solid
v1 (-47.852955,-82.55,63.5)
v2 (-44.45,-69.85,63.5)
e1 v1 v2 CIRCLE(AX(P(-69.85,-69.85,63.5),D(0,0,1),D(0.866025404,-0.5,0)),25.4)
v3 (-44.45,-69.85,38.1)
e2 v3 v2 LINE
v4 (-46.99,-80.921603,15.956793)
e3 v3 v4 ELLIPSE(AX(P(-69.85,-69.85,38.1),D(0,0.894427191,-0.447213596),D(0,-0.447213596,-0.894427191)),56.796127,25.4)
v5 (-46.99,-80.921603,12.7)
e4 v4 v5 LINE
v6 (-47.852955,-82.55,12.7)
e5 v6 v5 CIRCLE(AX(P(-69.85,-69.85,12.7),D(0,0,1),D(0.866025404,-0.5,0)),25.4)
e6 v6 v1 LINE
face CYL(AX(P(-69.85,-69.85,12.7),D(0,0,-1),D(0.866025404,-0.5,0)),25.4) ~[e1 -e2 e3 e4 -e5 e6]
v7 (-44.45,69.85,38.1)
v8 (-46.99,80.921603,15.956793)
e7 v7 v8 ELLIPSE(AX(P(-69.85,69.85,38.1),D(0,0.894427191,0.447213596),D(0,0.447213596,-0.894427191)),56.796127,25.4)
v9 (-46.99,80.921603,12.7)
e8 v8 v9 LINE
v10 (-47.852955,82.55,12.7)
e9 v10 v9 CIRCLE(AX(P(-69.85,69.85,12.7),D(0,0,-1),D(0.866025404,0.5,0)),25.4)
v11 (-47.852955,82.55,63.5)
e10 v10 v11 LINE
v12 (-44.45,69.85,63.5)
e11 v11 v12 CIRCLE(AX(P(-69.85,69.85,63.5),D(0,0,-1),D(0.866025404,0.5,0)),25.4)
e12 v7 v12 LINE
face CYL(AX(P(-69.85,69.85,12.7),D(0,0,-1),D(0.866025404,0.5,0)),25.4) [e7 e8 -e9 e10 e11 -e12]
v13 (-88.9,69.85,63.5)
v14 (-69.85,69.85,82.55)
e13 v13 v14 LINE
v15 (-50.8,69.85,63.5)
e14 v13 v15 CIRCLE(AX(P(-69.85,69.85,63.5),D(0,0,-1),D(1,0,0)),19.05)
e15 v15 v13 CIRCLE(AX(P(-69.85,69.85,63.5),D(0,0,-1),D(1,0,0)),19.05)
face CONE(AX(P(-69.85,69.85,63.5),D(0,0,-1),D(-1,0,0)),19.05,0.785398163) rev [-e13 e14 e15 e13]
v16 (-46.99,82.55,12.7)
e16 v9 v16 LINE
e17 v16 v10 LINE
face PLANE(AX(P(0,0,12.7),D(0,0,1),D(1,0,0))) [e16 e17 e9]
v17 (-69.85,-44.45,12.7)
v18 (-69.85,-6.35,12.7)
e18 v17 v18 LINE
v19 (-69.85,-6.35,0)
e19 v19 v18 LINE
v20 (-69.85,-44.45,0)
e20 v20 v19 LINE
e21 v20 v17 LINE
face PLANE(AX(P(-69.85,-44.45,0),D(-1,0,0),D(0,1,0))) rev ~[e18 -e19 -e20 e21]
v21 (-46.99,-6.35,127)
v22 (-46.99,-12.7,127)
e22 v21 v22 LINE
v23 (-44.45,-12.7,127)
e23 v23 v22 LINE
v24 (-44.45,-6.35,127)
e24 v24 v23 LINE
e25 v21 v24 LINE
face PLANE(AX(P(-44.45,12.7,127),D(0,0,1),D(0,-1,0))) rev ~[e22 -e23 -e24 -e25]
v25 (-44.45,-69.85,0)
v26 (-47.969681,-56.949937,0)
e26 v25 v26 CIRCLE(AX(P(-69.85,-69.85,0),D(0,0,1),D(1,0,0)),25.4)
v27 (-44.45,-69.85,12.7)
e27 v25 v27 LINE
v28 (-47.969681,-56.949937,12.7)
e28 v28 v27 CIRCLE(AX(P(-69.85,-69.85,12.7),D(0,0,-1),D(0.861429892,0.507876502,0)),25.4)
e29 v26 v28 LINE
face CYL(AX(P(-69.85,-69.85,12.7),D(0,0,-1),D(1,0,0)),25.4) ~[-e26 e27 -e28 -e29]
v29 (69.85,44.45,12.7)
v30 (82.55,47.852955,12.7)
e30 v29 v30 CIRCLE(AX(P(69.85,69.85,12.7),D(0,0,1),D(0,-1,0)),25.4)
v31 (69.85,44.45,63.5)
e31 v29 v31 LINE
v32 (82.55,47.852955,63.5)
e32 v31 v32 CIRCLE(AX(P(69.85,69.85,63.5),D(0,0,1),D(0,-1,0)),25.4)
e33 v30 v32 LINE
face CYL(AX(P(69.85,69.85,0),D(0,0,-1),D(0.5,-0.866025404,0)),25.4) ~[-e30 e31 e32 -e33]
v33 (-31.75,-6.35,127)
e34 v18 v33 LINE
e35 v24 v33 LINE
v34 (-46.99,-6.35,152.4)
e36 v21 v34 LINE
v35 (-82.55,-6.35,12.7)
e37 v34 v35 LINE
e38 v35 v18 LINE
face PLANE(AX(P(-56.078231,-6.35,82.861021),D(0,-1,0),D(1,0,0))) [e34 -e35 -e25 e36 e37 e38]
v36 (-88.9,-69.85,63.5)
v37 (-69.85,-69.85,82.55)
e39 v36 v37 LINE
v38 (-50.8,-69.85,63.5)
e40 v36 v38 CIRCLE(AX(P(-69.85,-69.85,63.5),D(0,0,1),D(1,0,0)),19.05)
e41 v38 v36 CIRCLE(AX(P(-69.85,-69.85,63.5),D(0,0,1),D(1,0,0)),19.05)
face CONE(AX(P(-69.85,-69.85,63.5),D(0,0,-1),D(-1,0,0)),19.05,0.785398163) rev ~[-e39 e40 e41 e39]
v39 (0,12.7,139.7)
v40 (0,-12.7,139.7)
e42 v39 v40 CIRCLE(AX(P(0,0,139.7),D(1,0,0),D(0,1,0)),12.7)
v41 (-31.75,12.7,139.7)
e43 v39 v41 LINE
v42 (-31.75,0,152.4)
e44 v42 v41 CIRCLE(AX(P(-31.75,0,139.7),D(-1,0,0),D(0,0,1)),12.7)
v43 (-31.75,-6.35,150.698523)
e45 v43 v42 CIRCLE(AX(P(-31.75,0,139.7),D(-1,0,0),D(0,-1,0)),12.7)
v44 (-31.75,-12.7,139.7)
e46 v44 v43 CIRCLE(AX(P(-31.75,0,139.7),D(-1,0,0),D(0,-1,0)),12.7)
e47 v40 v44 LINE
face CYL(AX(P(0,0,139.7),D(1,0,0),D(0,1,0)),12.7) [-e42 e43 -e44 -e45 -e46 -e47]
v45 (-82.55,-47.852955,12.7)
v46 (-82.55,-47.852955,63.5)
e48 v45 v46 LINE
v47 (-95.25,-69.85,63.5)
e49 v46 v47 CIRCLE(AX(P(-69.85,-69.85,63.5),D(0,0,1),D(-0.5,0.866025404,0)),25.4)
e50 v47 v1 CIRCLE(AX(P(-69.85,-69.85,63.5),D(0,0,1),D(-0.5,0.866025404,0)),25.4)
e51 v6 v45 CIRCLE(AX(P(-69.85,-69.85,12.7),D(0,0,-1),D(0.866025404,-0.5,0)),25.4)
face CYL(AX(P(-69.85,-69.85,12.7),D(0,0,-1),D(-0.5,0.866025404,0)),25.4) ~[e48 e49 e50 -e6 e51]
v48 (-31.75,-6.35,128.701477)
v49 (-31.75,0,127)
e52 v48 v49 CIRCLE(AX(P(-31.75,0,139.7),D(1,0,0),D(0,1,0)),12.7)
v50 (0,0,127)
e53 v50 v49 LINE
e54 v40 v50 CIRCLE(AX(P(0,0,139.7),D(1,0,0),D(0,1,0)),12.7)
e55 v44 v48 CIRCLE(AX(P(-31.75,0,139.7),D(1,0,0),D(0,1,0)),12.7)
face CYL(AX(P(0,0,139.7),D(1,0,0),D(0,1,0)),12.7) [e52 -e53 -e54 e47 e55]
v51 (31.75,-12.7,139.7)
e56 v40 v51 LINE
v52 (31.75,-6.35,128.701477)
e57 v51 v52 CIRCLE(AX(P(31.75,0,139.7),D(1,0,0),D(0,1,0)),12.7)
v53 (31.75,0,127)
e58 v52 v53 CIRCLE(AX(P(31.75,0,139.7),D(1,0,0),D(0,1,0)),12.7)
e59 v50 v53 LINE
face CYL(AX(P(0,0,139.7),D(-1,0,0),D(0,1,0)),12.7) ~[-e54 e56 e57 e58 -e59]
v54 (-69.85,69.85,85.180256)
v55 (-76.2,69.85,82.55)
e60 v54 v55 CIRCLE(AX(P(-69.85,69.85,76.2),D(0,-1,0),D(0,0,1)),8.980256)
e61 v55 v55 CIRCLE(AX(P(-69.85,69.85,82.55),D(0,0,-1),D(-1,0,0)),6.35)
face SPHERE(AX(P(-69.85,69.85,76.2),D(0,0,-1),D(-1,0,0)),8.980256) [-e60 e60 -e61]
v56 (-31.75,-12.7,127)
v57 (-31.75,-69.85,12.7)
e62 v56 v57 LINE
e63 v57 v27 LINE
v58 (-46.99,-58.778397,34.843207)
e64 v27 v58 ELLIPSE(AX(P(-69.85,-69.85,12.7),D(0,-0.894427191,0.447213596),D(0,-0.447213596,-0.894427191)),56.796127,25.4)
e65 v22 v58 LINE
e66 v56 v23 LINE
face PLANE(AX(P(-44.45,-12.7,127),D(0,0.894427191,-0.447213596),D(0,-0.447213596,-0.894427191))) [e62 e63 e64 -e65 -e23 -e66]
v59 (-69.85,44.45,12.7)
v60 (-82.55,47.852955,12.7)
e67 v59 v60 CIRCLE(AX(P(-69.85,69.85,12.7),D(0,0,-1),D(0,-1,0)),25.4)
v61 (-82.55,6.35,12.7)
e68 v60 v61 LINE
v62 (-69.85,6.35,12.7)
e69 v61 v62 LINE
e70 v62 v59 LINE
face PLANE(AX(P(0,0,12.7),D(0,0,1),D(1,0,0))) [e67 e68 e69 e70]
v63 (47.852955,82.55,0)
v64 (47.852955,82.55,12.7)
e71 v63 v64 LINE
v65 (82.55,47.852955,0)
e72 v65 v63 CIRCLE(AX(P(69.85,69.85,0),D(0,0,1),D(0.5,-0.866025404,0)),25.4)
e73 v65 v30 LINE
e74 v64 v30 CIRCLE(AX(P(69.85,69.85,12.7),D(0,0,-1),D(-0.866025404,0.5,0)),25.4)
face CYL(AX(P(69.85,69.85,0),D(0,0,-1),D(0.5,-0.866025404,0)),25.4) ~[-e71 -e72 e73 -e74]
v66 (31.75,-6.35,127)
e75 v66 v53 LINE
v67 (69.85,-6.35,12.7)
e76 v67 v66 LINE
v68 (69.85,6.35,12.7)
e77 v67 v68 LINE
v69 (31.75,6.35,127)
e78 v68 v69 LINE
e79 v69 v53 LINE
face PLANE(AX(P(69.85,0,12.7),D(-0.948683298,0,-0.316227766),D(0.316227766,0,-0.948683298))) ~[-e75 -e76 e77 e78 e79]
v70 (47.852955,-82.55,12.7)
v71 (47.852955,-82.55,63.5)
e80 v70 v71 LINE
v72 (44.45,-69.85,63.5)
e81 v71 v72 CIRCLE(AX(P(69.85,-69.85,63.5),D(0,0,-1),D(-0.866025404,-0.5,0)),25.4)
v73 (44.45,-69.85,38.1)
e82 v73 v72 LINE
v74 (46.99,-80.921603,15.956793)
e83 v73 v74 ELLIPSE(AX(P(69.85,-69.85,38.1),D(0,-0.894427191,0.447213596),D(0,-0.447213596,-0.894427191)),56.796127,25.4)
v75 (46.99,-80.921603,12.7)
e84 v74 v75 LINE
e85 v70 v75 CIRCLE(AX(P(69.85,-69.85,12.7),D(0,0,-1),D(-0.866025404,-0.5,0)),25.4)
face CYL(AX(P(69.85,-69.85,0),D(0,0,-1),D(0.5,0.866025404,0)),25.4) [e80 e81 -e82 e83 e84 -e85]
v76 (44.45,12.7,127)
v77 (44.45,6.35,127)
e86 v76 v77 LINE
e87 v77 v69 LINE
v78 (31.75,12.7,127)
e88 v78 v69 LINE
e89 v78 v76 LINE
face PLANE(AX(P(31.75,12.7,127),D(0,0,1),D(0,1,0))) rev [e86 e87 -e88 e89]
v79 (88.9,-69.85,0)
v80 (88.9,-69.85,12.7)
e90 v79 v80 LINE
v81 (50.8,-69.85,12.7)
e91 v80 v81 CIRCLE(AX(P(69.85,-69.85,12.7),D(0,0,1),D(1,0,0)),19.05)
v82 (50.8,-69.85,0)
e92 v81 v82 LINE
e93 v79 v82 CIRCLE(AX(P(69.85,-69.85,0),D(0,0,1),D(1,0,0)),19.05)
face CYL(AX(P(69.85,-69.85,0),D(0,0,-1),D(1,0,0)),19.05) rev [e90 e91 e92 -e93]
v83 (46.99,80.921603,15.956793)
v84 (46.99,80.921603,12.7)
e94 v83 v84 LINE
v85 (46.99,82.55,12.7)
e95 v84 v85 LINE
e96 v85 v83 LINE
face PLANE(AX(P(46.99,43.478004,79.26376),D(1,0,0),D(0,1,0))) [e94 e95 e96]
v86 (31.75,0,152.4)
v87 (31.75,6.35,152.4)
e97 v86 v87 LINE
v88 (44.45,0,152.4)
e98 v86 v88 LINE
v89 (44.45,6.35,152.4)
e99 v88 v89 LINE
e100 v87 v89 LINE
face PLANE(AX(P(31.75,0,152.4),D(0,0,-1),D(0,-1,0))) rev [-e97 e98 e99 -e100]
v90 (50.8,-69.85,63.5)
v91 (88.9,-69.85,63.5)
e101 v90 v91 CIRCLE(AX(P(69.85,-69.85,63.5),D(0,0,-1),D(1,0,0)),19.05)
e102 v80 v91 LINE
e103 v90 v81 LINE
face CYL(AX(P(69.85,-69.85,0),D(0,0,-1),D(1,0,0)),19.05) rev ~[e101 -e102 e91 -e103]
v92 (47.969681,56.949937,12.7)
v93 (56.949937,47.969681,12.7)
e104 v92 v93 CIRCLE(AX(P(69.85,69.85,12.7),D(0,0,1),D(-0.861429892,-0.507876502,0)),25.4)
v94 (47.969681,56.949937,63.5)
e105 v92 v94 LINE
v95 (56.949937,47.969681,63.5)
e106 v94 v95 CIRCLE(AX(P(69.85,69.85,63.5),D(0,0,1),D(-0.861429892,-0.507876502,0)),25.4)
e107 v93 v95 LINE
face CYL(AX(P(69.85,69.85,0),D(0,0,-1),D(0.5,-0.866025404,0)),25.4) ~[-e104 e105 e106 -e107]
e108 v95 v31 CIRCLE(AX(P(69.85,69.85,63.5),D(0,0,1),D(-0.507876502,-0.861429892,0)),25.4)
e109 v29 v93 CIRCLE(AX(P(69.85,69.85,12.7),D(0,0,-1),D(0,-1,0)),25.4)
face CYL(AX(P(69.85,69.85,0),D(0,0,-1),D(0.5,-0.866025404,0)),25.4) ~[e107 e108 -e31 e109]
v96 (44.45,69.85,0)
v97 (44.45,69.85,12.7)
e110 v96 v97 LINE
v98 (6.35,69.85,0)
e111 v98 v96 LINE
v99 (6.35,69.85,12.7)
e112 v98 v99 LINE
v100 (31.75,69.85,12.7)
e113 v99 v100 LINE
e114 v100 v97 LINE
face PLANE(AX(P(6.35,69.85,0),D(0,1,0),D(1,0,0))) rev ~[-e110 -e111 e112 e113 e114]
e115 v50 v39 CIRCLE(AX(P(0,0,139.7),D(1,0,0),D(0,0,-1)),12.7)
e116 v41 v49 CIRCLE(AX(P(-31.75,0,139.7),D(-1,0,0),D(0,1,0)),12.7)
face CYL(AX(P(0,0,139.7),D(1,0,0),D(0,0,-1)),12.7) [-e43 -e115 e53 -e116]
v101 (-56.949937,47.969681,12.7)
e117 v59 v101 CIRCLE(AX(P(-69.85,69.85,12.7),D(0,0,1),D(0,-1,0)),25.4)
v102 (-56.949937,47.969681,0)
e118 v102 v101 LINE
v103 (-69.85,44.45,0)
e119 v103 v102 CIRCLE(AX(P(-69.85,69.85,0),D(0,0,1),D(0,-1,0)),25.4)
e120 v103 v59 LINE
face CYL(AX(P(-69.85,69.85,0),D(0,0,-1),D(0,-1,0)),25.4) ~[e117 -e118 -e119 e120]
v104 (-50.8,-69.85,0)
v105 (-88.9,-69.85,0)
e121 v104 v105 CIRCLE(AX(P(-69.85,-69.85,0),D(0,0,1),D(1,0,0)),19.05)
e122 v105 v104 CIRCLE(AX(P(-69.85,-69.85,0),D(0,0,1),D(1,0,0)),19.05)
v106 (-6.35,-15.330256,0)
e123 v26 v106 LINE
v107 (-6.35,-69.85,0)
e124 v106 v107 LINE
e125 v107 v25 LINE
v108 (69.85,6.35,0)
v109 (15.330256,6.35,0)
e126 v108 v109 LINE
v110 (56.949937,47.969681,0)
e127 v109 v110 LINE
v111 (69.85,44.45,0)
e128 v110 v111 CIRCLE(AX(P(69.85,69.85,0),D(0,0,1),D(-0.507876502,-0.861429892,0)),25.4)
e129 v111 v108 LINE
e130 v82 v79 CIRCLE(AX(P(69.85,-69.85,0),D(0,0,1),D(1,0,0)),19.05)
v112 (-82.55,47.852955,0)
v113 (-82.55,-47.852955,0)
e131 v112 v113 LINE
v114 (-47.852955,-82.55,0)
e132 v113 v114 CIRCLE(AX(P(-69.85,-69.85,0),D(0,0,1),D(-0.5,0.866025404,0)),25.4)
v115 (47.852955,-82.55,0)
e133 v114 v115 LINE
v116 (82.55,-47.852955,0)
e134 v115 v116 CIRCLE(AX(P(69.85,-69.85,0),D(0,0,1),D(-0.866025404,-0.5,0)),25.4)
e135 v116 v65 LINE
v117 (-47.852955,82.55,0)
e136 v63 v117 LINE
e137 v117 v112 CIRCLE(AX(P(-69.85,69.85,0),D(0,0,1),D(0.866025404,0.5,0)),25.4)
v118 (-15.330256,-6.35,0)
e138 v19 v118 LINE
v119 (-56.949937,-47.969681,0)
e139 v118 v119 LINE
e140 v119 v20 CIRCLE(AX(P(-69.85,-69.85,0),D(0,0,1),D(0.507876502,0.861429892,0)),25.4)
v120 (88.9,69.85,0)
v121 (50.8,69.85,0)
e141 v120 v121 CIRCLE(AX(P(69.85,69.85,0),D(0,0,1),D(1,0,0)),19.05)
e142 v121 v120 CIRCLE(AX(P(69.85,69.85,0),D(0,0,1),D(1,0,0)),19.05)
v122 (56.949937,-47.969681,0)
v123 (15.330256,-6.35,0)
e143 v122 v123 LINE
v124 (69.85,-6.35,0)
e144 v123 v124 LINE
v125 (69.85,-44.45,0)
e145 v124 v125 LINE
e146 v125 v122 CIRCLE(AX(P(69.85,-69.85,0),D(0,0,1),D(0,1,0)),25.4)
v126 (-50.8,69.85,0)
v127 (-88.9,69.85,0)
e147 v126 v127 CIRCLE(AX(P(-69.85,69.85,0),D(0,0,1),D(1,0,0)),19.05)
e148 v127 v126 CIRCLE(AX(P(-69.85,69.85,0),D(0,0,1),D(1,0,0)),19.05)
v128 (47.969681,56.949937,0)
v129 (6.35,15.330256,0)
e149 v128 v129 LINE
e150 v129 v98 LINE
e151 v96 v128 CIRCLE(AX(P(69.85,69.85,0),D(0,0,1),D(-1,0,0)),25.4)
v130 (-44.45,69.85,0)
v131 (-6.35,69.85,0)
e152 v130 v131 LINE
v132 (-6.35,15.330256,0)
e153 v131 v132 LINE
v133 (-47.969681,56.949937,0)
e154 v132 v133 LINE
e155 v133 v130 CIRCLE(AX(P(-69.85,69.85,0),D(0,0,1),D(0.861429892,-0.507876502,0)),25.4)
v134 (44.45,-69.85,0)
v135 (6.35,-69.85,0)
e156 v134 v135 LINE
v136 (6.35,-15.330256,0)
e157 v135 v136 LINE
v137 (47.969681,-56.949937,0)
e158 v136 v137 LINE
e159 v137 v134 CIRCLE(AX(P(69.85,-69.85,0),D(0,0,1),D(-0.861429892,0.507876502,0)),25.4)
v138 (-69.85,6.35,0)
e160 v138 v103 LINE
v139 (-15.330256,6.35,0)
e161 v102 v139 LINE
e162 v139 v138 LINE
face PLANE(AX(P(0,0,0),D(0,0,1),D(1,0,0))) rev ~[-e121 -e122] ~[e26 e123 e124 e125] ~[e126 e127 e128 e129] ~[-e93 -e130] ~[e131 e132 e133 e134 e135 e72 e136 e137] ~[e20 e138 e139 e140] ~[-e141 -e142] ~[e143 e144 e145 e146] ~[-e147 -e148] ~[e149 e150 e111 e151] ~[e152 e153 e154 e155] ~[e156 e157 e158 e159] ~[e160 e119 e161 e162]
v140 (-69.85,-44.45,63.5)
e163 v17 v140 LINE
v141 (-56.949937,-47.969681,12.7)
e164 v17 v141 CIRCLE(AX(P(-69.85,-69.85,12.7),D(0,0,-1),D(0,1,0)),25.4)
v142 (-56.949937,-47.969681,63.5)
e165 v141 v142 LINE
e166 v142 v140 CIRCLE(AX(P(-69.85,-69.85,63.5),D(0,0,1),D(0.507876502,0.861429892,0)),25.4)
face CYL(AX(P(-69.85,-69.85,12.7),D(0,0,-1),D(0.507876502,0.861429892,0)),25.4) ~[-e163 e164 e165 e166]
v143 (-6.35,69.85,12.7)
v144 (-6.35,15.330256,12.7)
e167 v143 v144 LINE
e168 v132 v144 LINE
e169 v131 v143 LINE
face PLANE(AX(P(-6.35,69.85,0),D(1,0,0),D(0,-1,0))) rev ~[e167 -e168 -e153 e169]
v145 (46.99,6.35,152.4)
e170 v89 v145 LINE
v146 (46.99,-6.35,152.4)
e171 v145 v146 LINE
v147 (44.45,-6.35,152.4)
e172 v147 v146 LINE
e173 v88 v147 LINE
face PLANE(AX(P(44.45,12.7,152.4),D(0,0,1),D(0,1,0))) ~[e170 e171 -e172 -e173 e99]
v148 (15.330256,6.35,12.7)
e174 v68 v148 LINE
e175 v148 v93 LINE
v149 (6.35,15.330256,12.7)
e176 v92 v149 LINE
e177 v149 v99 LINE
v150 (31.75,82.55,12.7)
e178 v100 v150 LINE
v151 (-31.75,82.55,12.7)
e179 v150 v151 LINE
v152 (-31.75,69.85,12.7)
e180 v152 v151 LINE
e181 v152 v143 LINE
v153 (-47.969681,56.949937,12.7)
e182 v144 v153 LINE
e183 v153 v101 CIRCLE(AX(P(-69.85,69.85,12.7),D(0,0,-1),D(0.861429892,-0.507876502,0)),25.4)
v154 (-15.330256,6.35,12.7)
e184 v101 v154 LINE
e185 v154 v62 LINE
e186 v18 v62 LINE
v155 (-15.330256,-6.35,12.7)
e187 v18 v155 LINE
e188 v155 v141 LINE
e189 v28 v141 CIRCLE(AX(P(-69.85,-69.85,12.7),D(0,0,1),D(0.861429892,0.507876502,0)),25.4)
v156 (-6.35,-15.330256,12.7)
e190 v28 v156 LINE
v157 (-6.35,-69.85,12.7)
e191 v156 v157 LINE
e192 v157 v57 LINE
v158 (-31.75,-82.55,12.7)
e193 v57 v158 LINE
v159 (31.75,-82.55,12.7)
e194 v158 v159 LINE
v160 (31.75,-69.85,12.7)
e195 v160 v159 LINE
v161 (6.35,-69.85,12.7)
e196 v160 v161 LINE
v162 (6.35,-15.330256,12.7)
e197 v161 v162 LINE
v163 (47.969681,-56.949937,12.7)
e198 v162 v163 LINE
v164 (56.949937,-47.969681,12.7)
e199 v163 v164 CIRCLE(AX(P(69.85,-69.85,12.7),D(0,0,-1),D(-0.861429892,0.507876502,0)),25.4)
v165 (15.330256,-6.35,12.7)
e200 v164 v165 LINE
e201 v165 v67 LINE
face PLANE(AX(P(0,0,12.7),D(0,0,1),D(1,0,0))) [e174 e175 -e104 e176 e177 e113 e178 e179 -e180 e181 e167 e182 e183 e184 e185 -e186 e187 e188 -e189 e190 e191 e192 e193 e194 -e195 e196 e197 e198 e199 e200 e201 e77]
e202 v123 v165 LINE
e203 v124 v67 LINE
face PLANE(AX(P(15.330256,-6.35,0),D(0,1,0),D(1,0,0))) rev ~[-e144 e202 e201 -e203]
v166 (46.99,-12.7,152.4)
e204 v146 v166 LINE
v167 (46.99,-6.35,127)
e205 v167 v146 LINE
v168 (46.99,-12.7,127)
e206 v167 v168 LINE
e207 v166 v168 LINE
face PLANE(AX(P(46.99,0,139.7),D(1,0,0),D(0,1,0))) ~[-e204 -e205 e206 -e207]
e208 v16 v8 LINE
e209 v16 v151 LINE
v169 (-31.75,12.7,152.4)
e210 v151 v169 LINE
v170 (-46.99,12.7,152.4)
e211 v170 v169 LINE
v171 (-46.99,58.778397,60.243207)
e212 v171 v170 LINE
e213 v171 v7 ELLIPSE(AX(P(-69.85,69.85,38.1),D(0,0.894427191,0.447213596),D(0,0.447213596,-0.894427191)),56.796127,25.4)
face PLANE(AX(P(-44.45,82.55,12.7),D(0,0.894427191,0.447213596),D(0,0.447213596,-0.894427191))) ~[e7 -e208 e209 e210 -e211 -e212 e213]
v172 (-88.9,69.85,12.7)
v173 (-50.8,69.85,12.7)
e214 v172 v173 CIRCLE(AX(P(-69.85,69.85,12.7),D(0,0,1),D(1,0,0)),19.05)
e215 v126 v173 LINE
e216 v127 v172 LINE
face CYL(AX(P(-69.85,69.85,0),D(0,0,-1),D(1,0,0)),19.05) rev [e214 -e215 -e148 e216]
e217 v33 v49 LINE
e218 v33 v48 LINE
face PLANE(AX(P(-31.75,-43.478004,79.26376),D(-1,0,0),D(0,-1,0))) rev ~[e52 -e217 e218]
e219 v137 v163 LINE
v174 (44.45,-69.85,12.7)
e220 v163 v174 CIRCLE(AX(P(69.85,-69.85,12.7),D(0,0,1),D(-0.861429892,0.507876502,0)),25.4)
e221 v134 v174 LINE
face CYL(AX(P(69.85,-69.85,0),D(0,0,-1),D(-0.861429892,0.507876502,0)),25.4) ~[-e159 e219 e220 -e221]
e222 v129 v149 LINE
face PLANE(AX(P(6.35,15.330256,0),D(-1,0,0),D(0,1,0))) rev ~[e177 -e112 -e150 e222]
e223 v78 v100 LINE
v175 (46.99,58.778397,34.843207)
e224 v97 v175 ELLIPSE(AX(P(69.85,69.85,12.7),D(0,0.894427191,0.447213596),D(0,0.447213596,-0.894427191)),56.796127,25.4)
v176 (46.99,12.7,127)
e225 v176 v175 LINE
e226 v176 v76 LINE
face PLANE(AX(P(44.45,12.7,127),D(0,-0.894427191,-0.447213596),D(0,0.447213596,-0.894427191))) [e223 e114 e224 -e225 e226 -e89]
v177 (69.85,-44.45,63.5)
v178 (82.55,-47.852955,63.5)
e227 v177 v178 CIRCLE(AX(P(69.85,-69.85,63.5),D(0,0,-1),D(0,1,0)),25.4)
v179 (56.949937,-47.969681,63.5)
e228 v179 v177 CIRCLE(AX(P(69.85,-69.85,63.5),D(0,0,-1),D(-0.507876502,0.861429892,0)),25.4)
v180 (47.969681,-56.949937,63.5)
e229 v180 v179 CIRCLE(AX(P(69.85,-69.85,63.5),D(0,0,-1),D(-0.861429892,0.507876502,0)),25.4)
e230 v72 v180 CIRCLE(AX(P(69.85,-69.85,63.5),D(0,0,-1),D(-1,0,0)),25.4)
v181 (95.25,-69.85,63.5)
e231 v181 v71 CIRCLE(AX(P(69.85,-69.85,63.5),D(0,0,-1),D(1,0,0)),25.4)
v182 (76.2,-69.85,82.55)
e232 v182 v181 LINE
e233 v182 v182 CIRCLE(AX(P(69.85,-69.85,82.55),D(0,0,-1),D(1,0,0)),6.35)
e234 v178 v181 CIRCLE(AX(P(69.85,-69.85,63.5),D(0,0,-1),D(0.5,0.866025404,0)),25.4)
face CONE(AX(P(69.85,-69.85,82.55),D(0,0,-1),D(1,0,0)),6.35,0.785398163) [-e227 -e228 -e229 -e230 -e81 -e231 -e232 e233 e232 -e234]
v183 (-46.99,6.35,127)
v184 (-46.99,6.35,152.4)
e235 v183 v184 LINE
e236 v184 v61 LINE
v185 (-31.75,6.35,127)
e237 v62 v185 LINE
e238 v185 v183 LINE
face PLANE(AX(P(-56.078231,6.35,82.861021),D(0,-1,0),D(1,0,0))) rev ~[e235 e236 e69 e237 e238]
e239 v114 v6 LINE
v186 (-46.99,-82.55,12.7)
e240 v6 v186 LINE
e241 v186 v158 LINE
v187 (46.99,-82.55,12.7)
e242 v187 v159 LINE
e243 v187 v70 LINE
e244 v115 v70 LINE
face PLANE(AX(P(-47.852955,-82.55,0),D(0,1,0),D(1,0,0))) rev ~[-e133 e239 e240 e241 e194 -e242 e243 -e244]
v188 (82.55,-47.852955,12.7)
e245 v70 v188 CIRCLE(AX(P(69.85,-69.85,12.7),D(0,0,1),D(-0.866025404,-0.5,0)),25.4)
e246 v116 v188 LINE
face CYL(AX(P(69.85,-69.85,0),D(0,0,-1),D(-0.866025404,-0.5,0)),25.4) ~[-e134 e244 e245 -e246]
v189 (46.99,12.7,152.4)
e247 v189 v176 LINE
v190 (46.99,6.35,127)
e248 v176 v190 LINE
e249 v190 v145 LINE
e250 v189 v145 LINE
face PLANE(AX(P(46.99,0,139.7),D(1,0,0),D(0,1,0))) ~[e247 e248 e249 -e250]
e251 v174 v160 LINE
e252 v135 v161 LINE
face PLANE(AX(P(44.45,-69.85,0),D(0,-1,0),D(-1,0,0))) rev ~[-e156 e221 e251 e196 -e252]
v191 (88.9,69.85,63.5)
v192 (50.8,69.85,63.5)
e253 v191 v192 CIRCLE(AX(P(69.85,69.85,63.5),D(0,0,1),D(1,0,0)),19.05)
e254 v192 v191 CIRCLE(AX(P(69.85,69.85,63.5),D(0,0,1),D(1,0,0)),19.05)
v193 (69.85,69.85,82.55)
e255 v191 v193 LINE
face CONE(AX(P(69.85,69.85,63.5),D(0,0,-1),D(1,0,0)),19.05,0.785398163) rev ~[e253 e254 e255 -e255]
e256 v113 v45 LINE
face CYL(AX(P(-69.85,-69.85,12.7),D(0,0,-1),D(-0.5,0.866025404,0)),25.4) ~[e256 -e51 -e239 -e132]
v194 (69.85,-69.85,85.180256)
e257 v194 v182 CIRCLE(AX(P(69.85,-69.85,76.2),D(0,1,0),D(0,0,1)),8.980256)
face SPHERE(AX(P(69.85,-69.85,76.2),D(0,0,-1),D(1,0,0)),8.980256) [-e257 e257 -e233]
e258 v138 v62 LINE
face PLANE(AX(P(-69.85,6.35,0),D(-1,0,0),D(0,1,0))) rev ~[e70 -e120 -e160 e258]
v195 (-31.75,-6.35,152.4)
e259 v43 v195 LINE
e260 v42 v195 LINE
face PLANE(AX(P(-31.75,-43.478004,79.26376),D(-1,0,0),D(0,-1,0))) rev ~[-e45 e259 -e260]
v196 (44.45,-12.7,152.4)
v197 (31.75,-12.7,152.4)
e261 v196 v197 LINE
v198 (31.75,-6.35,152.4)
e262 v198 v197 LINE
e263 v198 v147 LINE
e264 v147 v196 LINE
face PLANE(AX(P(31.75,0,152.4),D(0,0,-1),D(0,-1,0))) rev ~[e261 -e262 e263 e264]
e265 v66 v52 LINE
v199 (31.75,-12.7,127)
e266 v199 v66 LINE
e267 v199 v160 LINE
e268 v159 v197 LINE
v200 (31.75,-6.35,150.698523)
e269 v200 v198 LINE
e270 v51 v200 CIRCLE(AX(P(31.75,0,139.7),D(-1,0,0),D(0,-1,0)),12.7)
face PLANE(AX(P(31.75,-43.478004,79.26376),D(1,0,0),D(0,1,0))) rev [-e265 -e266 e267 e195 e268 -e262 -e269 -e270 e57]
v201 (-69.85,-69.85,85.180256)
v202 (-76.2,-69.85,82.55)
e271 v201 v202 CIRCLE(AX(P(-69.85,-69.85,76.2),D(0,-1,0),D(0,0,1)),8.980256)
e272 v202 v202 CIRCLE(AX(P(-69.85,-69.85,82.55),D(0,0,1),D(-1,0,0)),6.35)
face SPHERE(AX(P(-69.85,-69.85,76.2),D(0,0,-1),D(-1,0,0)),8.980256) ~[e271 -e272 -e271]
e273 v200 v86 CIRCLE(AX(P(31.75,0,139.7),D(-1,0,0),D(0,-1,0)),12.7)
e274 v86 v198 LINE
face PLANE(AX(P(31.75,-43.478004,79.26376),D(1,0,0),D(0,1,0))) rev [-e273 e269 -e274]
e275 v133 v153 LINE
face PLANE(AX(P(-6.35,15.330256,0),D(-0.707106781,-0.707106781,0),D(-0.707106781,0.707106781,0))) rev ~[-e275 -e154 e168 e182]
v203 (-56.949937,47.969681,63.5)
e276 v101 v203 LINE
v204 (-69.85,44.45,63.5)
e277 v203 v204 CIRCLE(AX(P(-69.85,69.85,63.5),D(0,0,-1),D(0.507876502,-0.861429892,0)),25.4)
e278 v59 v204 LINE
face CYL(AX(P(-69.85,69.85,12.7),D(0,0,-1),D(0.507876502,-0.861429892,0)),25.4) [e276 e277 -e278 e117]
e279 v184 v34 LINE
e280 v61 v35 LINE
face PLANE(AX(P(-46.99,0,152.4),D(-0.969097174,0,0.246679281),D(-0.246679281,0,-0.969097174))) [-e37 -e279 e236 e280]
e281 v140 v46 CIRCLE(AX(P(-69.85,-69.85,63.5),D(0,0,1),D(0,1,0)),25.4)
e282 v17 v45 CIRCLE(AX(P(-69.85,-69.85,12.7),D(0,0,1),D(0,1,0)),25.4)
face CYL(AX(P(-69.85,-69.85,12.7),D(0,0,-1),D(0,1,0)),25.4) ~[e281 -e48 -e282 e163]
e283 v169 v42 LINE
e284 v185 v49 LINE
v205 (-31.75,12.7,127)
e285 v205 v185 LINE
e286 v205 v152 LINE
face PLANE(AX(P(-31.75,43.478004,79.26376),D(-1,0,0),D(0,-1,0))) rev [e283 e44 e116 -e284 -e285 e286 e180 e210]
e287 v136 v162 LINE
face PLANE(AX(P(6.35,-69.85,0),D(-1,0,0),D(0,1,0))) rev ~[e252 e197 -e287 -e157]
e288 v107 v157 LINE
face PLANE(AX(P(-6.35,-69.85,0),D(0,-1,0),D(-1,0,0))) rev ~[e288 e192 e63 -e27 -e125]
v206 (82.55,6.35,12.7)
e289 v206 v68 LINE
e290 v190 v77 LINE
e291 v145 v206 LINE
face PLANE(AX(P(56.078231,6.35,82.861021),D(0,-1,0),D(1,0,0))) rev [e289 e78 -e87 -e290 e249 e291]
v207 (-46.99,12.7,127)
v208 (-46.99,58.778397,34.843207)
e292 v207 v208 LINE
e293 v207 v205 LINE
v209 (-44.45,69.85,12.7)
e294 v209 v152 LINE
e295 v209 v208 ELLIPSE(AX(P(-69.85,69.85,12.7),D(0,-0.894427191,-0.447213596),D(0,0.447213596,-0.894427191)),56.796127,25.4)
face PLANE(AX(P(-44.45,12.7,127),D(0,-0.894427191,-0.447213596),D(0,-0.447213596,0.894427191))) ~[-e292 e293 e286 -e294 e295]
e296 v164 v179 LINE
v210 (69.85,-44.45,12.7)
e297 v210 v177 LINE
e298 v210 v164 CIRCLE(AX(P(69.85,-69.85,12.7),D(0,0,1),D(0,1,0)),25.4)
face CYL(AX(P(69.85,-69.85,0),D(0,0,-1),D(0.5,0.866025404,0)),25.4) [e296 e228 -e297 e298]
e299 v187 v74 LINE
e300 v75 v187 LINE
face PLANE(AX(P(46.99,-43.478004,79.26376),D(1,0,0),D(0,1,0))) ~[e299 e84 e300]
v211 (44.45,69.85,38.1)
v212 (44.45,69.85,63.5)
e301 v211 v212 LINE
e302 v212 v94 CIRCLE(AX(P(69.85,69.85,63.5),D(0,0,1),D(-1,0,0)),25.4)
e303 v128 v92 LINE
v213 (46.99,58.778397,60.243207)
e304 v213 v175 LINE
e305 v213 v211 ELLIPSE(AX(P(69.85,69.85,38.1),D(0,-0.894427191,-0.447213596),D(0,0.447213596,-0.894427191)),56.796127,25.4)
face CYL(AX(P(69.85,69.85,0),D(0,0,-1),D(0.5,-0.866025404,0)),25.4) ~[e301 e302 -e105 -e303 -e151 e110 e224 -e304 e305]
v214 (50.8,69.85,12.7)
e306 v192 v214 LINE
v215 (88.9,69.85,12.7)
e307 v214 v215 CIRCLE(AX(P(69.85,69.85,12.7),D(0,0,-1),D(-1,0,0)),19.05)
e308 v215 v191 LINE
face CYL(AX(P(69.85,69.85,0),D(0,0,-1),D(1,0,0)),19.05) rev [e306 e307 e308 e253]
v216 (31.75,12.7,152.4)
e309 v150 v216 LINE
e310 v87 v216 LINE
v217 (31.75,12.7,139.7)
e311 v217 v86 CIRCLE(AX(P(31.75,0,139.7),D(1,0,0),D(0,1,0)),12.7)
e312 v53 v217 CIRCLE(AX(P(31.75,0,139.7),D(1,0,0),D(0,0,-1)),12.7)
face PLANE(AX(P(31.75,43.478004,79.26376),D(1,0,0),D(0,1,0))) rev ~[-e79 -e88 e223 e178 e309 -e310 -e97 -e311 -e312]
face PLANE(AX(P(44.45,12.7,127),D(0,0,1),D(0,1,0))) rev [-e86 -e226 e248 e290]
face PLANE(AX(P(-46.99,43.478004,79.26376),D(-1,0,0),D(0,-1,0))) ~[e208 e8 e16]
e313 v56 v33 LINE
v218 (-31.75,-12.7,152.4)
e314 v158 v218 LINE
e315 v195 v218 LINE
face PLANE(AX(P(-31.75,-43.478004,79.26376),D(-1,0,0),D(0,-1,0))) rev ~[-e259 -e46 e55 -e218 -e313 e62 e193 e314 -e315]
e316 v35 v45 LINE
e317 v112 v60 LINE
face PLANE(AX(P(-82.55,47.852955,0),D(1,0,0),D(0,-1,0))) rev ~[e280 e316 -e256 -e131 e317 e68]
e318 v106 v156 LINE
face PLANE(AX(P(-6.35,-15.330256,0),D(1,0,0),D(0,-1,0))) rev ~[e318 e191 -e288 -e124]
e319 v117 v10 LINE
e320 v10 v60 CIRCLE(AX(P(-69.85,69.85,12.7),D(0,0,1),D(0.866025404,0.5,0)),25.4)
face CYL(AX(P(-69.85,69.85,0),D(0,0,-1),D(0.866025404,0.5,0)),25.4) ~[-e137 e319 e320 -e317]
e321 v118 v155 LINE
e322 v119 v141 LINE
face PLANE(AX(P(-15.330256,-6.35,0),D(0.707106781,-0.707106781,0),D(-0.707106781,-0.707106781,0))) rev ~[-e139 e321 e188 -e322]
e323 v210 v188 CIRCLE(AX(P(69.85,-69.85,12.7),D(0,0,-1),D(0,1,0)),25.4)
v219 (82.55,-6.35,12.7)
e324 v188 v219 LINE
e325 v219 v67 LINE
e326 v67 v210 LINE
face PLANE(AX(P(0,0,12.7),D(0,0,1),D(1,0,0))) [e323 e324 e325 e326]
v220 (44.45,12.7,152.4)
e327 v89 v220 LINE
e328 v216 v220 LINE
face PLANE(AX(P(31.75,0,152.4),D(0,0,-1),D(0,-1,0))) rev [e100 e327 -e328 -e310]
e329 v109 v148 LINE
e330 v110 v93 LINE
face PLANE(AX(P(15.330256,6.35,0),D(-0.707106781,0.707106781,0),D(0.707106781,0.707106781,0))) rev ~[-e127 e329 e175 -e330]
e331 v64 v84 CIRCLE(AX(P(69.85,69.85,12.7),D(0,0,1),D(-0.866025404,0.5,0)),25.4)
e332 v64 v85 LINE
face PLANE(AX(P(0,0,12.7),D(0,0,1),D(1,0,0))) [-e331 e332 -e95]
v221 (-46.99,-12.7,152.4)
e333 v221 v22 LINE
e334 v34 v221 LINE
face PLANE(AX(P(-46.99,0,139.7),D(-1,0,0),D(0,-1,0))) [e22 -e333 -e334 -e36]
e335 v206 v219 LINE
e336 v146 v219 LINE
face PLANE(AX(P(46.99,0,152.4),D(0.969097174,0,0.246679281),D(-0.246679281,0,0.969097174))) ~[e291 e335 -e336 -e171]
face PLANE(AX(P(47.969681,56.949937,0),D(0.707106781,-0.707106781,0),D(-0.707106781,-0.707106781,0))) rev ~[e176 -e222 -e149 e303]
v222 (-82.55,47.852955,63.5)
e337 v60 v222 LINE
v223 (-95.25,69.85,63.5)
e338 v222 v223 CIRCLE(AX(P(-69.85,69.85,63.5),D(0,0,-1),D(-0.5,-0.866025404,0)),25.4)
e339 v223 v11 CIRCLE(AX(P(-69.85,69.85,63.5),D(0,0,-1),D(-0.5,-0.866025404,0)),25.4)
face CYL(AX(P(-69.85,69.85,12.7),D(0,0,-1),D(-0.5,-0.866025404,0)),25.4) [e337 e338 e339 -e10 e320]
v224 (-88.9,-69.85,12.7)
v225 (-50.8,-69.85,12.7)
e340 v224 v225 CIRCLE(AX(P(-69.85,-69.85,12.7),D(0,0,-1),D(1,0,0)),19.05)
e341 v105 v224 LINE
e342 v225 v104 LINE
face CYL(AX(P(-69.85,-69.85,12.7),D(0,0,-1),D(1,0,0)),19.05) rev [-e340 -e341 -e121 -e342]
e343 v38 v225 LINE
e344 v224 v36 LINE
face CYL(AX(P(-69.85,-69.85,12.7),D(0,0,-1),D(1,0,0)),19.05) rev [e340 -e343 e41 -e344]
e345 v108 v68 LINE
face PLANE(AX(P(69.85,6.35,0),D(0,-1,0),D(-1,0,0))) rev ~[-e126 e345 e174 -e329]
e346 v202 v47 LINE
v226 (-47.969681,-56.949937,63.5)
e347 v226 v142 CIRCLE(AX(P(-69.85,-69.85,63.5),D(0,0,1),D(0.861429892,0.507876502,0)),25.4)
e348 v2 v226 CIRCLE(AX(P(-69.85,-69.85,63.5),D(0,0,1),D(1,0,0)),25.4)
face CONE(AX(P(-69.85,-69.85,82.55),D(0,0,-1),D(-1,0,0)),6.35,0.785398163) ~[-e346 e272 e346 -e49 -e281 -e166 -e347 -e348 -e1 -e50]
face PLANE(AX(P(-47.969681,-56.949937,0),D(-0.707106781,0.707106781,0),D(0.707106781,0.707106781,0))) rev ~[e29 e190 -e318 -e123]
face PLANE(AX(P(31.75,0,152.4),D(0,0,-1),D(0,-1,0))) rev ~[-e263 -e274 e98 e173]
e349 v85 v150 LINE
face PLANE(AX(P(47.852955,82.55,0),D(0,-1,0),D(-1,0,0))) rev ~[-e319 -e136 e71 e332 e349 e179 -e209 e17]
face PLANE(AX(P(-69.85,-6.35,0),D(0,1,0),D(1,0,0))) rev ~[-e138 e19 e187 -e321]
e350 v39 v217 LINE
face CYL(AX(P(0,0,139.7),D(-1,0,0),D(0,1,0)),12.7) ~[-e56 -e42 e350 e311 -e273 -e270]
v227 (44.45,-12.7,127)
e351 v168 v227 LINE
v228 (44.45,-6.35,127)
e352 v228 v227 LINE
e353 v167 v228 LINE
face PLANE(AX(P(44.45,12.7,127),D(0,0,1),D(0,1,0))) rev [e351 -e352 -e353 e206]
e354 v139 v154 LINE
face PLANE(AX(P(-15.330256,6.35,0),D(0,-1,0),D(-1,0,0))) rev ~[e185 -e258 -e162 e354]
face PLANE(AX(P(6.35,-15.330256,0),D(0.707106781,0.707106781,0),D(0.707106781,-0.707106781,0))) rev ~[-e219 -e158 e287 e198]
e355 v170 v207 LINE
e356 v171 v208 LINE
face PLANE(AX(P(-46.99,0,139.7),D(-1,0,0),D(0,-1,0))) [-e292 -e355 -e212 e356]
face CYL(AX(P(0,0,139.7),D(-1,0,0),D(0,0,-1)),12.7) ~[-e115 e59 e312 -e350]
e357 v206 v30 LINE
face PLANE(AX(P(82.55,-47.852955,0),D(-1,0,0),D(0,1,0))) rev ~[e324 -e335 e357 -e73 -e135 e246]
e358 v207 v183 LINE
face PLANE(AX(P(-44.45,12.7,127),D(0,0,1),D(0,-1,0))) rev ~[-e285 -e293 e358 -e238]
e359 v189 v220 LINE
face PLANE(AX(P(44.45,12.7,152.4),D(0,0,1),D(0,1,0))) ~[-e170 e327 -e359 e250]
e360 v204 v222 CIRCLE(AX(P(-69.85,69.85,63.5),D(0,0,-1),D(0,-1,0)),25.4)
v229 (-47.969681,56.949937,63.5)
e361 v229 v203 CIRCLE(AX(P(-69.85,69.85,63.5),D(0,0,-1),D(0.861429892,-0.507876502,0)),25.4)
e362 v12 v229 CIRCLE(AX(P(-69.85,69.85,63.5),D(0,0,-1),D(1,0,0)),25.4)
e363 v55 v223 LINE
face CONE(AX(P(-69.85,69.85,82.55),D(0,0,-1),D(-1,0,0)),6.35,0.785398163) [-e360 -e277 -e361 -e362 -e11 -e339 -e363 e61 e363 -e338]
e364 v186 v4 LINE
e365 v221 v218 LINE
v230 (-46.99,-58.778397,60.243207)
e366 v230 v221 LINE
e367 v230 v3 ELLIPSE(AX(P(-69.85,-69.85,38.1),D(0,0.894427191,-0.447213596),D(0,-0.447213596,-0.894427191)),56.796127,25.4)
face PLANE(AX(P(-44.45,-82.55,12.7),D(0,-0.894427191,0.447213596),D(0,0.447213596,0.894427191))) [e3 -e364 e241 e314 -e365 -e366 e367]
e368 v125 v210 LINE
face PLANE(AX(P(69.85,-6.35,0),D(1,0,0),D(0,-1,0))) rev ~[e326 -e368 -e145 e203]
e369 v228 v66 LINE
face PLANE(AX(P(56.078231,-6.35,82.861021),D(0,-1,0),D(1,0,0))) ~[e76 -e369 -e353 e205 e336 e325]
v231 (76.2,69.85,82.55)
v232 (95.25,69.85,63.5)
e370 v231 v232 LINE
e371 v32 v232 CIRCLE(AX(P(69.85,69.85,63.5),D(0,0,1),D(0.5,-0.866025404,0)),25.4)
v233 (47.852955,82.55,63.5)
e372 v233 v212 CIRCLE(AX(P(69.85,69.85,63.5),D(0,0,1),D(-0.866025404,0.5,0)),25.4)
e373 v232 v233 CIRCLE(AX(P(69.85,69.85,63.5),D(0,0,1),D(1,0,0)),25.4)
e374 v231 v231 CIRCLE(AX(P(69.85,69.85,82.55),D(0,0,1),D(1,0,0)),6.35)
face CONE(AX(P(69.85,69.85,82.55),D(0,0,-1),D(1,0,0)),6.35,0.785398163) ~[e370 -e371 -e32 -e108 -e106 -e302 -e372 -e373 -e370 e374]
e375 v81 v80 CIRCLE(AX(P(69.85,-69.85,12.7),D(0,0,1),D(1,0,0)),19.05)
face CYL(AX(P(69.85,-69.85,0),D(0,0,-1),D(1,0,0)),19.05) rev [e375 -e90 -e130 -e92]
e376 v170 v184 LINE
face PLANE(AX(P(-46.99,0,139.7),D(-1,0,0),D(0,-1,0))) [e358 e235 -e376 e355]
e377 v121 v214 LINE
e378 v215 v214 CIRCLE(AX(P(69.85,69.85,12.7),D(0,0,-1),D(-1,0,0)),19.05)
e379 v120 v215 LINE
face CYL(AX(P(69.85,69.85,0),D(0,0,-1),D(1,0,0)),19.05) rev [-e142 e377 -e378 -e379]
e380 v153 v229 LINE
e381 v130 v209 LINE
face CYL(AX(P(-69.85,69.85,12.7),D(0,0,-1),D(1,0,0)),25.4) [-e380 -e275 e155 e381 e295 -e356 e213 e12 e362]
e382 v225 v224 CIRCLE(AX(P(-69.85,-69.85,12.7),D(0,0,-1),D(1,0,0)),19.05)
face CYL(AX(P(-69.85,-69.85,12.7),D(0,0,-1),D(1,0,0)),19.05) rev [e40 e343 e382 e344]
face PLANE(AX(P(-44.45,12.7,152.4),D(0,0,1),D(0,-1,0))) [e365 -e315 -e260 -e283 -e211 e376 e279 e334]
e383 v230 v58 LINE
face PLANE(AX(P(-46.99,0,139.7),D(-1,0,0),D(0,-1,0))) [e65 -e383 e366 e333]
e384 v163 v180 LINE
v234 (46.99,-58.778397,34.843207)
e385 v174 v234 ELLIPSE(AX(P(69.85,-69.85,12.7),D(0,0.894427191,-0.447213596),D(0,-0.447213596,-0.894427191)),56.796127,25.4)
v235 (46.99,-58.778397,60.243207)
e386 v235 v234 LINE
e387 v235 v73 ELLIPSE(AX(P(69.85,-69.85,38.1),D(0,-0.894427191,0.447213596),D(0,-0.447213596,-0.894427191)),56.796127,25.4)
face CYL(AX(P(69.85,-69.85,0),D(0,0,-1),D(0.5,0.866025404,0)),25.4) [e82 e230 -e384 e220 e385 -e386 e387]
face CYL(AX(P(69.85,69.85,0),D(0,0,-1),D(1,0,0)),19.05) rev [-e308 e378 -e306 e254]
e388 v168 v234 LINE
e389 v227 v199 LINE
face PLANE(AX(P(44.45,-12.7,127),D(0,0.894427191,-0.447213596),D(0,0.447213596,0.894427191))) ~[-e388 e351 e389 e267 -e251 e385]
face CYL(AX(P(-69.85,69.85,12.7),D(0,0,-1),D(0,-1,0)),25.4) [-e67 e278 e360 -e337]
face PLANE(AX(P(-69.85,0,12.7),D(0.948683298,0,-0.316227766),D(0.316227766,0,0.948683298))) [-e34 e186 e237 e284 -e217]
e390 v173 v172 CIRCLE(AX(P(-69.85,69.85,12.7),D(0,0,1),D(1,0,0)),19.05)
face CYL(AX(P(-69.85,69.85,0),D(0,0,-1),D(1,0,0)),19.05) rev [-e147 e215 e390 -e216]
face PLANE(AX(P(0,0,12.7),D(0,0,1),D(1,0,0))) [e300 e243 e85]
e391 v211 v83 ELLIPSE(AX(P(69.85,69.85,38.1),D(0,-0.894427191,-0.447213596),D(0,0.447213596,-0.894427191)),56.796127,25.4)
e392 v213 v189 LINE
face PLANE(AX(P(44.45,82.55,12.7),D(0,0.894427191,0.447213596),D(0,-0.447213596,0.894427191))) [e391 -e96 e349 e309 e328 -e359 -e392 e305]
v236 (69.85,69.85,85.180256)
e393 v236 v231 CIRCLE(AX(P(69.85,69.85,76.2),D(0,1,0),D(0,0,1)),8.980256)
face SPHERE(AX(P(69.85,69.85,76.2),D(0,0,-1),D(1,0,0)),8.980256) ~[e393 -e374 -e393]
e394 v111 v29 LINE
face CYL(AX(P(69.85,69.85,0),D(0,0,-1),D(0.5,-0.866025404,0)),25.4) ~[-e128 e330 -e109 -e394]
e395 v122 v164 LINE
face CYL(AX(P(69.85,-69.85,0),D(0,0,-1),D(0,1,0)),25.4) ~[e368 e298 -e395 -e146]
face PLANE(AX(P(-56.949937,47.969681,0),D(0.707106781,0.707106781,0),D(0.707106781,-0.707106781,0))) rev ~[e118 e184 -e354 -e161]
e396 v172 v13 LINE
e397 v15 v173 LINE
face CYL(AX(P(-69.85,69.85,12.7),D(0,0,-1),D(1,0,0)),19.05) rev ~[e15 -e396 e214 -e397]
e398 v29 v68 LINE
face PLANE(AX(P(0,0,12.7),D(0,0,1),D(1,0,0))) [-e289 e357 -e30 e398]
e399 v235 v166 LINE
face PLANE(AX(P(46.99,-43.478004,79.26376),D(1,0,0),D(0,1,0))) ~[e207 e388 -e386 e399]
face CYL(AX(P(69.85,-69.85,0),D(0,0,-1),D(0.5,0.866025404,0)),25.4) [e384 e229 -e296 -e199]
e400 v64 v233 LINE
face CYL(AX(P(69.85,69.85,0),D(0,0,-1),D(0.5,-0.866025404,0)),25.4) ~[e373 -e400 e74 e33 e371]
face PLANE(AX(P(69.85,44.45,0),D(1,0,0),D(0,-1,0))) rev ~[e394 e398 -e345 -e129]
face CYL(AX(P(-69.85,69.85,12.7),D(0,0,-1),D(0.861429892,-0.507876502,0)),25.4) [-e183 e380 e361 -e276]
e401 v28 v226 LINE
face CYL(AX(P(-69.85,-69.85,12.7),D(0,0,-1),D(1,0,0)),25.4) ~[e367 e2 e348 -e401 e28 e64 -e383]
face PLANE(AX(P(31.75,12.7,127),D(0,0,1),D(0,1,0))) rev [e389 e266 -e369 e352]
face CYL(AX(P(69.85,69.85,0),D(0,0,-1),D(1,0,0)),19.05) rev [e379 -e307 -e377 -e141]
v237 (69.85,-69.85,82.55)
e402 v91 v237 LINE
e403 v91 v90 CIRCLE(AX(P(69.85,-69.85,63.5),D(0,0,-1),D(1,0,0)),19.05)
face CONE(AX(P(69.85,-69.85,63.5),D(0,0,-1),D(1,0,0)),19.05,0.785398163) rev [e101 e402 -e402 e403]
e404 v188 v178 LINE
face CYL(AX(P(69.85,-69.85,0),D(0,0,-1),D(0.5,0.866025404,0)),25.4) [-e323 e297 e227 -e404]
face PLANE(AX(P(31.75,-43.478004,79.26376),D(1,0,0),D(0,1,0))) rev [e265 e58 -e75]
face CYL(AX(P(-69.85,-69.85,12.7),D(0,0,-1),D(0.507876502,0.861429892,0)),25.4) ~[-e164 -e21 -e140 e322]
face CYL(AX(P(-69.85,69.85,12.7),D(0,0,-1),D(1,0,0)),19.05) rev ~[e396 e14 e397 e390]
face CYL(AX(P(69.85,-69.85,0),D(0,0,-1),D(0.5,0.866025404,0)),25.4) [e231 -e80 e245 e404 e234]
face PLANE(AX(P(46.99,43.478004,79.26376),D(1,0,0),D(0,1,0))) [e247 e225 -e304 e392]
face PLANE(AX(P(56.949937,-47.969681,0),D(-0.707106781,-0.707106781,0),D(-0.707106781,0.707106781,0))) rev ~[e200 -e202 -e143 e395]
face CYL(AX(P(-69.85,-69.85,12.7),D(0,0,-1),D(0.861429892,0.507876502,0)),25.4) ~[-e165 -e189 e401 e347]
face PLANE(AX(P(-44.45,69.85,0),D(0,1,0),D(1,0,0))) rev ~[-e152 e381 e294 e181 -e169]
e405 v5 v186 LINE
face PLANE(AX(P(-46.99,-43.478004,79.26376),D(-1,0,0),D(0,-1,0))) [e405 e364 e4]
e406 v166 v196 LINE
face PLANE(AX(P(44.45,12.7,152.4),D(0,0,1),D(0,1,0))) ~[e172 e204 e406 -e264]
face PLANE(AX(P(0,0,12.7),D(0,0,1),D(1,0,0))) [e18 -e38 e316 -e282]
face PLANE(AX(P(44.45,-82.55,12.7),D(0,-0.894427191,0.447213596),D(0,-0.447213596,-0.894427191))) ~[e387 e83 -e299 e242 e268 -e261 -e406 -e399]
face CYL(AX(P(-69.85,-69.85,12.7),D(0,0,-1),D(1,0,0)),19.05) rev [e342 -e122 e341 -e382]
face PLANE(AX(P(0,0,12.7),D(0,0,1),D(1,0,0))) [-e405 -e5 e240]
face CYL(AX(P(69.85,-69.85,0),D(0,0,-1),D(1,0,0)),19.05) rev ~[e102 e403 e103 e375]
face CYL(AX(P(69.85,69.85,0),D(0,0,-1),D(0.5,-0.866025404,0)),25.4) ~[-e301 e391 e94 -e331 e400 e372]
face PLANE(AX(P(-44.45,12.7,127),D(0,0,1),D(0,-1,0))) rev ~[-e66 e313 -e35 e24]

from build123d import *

# Parameters (mm, degrees)
F0_R           = 19.05
F1_DEPTH       = 12.7
F2_R           = 19.05
F3_DEPTH       = 50.8
F5_DEPTH       = 31.75
F7_DEPTH       = 12.7
F15_DEPTH      = 2.54
F15_DEPTH_BACK = 12.7
F18_W          = 25.4
F18_H          = 25.4
F19_DEPTH      = 2.54
F22_DEPTH      = 6.35


# Not quite as in the source:
# - after a boolean that leaves OpenCascade's solid faulty, fix() repairs it
# - a feature of the source that left no trace in its solid (it failed there, or was rolled back) is left out


with BuildPart() as f1:
    # F0 (on Top) → F1 (new body)
    with BuildSketch(Plane.XY):
        with BuildLine():
            Line((82.55, 6.35), (82.55, 47.8529547439))
            ThreePointArc((82.55, 47.8529547439), (87.8105122421, 87.8105122421), (47.8529547439, 82.55))
            Line((47.8529547439, 82.55), (0, 82.55))
            Line((0, 82.55), (-47.8529547439, 82.55))
            ThreePointArc((-47.8529547439, 82.55), (-87.8105122421, 87.8105122421), (-82.55, 47.8529547439))
            Line((-82.55, 47.8529547439), (-82.55, 6.35))
            Line((-82.55, 6.35), (-82.55, 0))
            Line((-82.55, 0), (-82.55, -6.35))
            Line((-82.55, -6.35), (-82.55, -47.8529547439))
            ThreePointArc((-82.55, -47.8529547439), (-87.8105122421, -87.8105122421), (-47.8529547439, -82.55))
            Line((-47.8529547439, -82.55), (0, -82.55))
            Line((0, -82.55), (47.8529547439, -82.55))
            ThreePointArc((47.8529547439, -82.55), (87.8105122421, -87.8105122421), (82.55, -47.8529547439))
            Line((82.55, -47.8529547439), (82.55, -6.35))
            Line((82.55, -6.35), (82.55, 0))
            Line((82.55, 0), (82.55, 6.35))
        make_face()
        with Locations((-69.85, -69.85)):
            Circle(F0_R, mode=Mode.SUBTRACT)
        with BuildLine():
            Line((-6.35, -69.85), (-44.45, -69.85))
            ThreePointArc((-44.45, -69.85), (-45.345713546, -63.1641982245), (-47.9696807387, -56.9499368597))
            Line((-47.9696807387, -56.9499368597), (-6.35, -15.3302561211))
            Line((-6.35, -15.3302561211), (-6.35, -69.85))
        make_face(mode=Mode.SUBTRACT)
        with BuildLine():
            Line((-69.85, -6.35), (-15.3302561211, -6.35))
            Line((-15.3302561211, -6.35), (-56.9499368597, -47.9696807387))
            ThreePointArc((-56.9499368597, -47.9696807387), (-63.1641982245, -45.345713546), (-69.85, -44.45))
            Line((-69.85, -44.45), (-69.85, -6.35))
        make_face(mode=Mode.SUBTRACT)
        with Locations((69.85, -69.85)):
            Circle(F0_R, mode=Mode.SUBTRACT)
        with BuildLine():
            ThreePointArc((47.9696807387, -56.9499368597), (45.345713546, -63.1641982245), (44.45, -69.85))
            Line((44.45, -69.85), (6.35, -69.85))
            Line((6.35, -69.85), (6.35, -15.3302561211))
            Line((6.35, -15.3302561211), (47.9696807387, -56.9499368597))
        make_face(mode=Mode.SUBTRACT)
        with BuildLine():
            Line((56.9499368597, -47.9696807387), (15.3302561211, -6.35))
            Line((15.3302561211, -6.35), (69.85, -6.35))
            Line((69.85, -6.35), (69.85, -44.45))
            ThreePointArc((69.85, -44.45), (63.1641982245, -45.345713546), (56.9499368597, -47.9696807387))
        make_face(mode=Mode.SUBTRACT)
        with BuildLine():
            Line((-56.9499368597, 47.9696807387), (-15.3302561211, 6.35))
            Line((-15.3302561211, 6.35), (-69.85, 6.35))
            Line((-69.85, 6.35), (-69.85, 44.45))
            ThreePointArc((-69.85, 44.45), (-63.1641982245, 45.345713546), (-56.9499368597, 47.9696807387))
        make_face(mode=Mode.SUBTRACT)
        with BuildLine():
            Line((-6.35, 69.85), (-6.35, 15.3302561211))
            Line((-6.35, 15.3302561211), (-47.9696807387, 56.9499368597))
            ThreePointArc((-47.9696807387, 56.9499368597), (-45.345713546, 63.1641982245), (-44.45, 69.85))
            Line((-44.45, 69.85), (-6.35, 69.85))
        make_face(mode=Mode.SUBTRACT)
        with Locations((-69.85, 69.85)):
            Circle(F0_R, mode=Mode.SUBTRACT)
        with BuildLine():
            Line((69.85, 6.35), (15.3302561211, 6.35))
            Line((15.3302561211, 6.35), (56.9499368597, 47.9696807387))
            ThreePointArc((56.9499368597, 47.9696807387), (63.1641982245, 45.345713546), (69.85, 44.45))
            Line((69.85, 44.45), (69.85, 6.35))
        make_face(mode=Mode.SUBTRACT)
        with BuildLine():
            Line((6.35, 15.3302561211), (6.35, 69.85))
            Line((6.35, 69.85), (44.45, 69.85))
            ThreePointArc((44.45, 69.85), (45.345713546, 63.1641982245), (47.9696807387, 56.9499368597))
            Line((47.9696807387, 56.9499368597), (6.35, 15.3302561211))
        make_face(mode=Mode.SUBTRACT)
        with Locations((69.85, 69.85)):
            Circle(F0_R, mode=Mode.SUBTRACT)
    extrude(amount=F1_DEPTH)

    # F2 (on face) → F3 (join)
    with BuildSketch(Plane.XY.offset(12.7)):
        with BuildLine():
            ThreePointArc((-69.85, -44.45), (-76.4240037456, -45.3154840123), (-82.55, -47.8529547439))
            ThreePointArc((-82.55, -47.8529547439), (-87.8105122421, -87.8105122421), (-47.8529547439, -82.55))
            ThreePointArc((-47.8529547439, -82.55), (-45.3154840123, -76.4240037456), (-44.45, -69.85))
            ThreePointArc((-44.45, -69.85), (-45.345713546, -63.1641982245), (-47.9696807387, -56.9499368597))
            ThreePointArc((-47.9696807387, -56.9499368597), (-51.8894877579, -51.8894877579), (-56.9499368597, -47.9696807387))
            ThreePointArc((-56.9499368597, -47.9696807387), (-63.1641982245, -45.345713546), (-69.85, -44.45))
        make_face()
        with Locations((-69.85, -69.85)):
            Circle(F2_R, mode=Mode.SUBTRACT)
        with BuildLine():
            ThreePointArc((95.25, 69.85), (76.4240037456, 94.3845159877), (47.8529547439, 82.55))
            ThreePointArc((47.8529547439, 82.55), (45.3154840123, 76.4240037456), (44.45, 69.85))
            ThreePointArc((44.45, 69.85), (45.345713546, 63.1641982245), (47.9696807387, 56.9499368597))
            ThreePointArc((47.9696807387, 56.9499368597), (51.8894877579, 51.8894877579), (56.9499368597, 47.9696807387))
            ThreePointArc((56.9499368597, 47.9696807387), (63.1641982245, 45.345713546), (69.85, 44.45))
            ThreePointArc((69.85, 44.45), (76.4240037456, 45.3154840123), (82.55, 47.8529547439))
            ThreePointArc((82.55, 47.8529547439), (91.8470452561, 57.15), (95.25, 69.85))
        make_face()
        with Locations((69.85, 69.85)):
            Circle(F2_R, mode=Mode.SUBTRACT)
    extrude(amount=F3_DEPTH)

    # F10 (on offset) → F11 (revolve)
    with BuildSketch(Plane.XZ.offset(69.85)):
        with BuildLine():
            Line((-76.2, 82.55), (-95.25, 63.5))
            Line((-95.25, 63.5), (-88.9, 63.5))
            Line((-88.9, 63.5), (-69.85, 82.55))
            Line((-69.85, 82.55), (-69.85, 85.1802561211))
            ThreePointArc((-69.85, 85.1802561211), (-73.2865952359, 84.496674827), (-76.2, 82.55))
        make_face()
    revolve(axis=Axis((-69.85, -69.85, 63.5), (0, 0, 1)))


with BuildPart() as f5:
    # F4 (on Right) → F5 (new body, symmetric)
    with BuildSketch(Plane.YZ):
        with BuildLine():
            ThreePointArc((0, 127), (8.9802561211, 130.7197438789), (12.7, 139.7))
            ThreePointArc((12.7, 139.7), (-8.9802561211, 148.6802561211), (0, 127))
        make_face()
    extrude(amount=F5_DEPTH, both=True)

    # F6 (on face) → F7 (join)
    with BuildSketch(Plane(origin=(-31.75, 0, 0), x_dir=(0, -1, 0), z_dir=(-1, 0, 0))):
        with BuildLine():
            ThreePointArc((1.818e-07, 152.4), (-8.9802560568, 148.6802561853), (-12.7, 139.7))
            ThreePointArc((-12.7, 139.7), (-8.9802561211, 130.7197438789), (0, 127))
            ThreePointArc((0, 127), (8.9802561211, 130.7197438789), (12.7, 139.7))
            ThreePointArc((12.7, 139.7), (8.9802561853, 148.6802560568), (1.818e-07, 152.4))
        make_face()
        with BuildLine():
            Line((-12.7, 152.4), (-12.7, 139.7))
            ThreePointArc((-12.7, 139.7), (-8.9802560568, 148.6802561853), (1.818e-07, 152.4))
            Line((1.818e-07, 152.4), (-12.7, 152.4))
        make_face()
        with BuildLine():
            ThreePointArc((0, 127), (-8.9802561211, 130.7197438789), (-12.7, 139.7))
            Line((-12.7, 139.7), (-12.7, 127))
            Line((-12.7, 127), (0, 127))
        make_face()
    extrude(amount=F7_DEPTH)

    # F8: F5 across plane


with BuildPart() as f5_1:
    add(f5.part)
    add(f5.part.mirror(Plane.YZ))


with BuildPart() as f12_1:
    # F12: instance of F1
    add(f1.part.mirror(Plane.XZ))


with BuildPart() as f1_1:
    add(f1.part)

    add(f12_1.part)  # F13 merges F12_1
    # F13: F1, F12_1 across plane
    add(f1.part.mirror(Plane.YZ))
    add(f12_1.part.mirror(Plane.YZ))

    add(f5_1.part)  # F15 merges F5
    # F14 (on face) → F15 (join, two sides)
    with BuildSketch(Plane(origin=(-44.45, 0, 0), x_dir=(0, -1, 0), z_dir=(-1, 0, 0))) as f15_sk:
        Polygon((12.7, 139.7), (12.7, 127), (69.85, 12.7), (82.55, 12.7), (12.7, 152.4), align=None)
    extrude(amount=F15_DEPTH)
    extrude(f15_sk.sketch, amount=-F15_DEPTH_BACK)

    add(f1_1.part.fix(), mode=Mode.REPLACE)


with BuildPart() as f16_1:
    # F16: instance of F1
    add(f1_1.part.mirror(Plane.YZ))


with BuildPart() as f1_2:
    add(f1_1.part)

    add(f16_1.part)  # F17 merges F16_1
    # F17: F1, F16_1 across plane
    add(f1_1.part.mirror(Plane.XZ))
    add(f16_1.part.mirror(Plane.XZ))

    # F18 (on face) → F19 (join)
    with BuildSketch(Plane(origin=(-44.45, 0, 0), x_dir=(0, -1, 0), z_dir=(-1, 0, 0))):
        with Locations((0, 139.7)):
            Rectangle(F18_W, F18_H)
    extrude(amount=F19_DEPTH)

    # F21 (on Front) → F22 (join, symmetric)
    with BuildSketch(Plane.XZ):
        Polygon((-31.75, 152.4), (-46.99, 152.4), (-82.55, 12.7), (-69.85, 12.7), (-31.75, 127), align=None)
    extrude(amount=F22_DEPTH, both=True)

    # F23: F1 across plane


with BuildPart() as f1_3:
    add(f1_2.part)
    add(f1_2.part.mirror(Plane.YZ))


solid = f1_3.part
